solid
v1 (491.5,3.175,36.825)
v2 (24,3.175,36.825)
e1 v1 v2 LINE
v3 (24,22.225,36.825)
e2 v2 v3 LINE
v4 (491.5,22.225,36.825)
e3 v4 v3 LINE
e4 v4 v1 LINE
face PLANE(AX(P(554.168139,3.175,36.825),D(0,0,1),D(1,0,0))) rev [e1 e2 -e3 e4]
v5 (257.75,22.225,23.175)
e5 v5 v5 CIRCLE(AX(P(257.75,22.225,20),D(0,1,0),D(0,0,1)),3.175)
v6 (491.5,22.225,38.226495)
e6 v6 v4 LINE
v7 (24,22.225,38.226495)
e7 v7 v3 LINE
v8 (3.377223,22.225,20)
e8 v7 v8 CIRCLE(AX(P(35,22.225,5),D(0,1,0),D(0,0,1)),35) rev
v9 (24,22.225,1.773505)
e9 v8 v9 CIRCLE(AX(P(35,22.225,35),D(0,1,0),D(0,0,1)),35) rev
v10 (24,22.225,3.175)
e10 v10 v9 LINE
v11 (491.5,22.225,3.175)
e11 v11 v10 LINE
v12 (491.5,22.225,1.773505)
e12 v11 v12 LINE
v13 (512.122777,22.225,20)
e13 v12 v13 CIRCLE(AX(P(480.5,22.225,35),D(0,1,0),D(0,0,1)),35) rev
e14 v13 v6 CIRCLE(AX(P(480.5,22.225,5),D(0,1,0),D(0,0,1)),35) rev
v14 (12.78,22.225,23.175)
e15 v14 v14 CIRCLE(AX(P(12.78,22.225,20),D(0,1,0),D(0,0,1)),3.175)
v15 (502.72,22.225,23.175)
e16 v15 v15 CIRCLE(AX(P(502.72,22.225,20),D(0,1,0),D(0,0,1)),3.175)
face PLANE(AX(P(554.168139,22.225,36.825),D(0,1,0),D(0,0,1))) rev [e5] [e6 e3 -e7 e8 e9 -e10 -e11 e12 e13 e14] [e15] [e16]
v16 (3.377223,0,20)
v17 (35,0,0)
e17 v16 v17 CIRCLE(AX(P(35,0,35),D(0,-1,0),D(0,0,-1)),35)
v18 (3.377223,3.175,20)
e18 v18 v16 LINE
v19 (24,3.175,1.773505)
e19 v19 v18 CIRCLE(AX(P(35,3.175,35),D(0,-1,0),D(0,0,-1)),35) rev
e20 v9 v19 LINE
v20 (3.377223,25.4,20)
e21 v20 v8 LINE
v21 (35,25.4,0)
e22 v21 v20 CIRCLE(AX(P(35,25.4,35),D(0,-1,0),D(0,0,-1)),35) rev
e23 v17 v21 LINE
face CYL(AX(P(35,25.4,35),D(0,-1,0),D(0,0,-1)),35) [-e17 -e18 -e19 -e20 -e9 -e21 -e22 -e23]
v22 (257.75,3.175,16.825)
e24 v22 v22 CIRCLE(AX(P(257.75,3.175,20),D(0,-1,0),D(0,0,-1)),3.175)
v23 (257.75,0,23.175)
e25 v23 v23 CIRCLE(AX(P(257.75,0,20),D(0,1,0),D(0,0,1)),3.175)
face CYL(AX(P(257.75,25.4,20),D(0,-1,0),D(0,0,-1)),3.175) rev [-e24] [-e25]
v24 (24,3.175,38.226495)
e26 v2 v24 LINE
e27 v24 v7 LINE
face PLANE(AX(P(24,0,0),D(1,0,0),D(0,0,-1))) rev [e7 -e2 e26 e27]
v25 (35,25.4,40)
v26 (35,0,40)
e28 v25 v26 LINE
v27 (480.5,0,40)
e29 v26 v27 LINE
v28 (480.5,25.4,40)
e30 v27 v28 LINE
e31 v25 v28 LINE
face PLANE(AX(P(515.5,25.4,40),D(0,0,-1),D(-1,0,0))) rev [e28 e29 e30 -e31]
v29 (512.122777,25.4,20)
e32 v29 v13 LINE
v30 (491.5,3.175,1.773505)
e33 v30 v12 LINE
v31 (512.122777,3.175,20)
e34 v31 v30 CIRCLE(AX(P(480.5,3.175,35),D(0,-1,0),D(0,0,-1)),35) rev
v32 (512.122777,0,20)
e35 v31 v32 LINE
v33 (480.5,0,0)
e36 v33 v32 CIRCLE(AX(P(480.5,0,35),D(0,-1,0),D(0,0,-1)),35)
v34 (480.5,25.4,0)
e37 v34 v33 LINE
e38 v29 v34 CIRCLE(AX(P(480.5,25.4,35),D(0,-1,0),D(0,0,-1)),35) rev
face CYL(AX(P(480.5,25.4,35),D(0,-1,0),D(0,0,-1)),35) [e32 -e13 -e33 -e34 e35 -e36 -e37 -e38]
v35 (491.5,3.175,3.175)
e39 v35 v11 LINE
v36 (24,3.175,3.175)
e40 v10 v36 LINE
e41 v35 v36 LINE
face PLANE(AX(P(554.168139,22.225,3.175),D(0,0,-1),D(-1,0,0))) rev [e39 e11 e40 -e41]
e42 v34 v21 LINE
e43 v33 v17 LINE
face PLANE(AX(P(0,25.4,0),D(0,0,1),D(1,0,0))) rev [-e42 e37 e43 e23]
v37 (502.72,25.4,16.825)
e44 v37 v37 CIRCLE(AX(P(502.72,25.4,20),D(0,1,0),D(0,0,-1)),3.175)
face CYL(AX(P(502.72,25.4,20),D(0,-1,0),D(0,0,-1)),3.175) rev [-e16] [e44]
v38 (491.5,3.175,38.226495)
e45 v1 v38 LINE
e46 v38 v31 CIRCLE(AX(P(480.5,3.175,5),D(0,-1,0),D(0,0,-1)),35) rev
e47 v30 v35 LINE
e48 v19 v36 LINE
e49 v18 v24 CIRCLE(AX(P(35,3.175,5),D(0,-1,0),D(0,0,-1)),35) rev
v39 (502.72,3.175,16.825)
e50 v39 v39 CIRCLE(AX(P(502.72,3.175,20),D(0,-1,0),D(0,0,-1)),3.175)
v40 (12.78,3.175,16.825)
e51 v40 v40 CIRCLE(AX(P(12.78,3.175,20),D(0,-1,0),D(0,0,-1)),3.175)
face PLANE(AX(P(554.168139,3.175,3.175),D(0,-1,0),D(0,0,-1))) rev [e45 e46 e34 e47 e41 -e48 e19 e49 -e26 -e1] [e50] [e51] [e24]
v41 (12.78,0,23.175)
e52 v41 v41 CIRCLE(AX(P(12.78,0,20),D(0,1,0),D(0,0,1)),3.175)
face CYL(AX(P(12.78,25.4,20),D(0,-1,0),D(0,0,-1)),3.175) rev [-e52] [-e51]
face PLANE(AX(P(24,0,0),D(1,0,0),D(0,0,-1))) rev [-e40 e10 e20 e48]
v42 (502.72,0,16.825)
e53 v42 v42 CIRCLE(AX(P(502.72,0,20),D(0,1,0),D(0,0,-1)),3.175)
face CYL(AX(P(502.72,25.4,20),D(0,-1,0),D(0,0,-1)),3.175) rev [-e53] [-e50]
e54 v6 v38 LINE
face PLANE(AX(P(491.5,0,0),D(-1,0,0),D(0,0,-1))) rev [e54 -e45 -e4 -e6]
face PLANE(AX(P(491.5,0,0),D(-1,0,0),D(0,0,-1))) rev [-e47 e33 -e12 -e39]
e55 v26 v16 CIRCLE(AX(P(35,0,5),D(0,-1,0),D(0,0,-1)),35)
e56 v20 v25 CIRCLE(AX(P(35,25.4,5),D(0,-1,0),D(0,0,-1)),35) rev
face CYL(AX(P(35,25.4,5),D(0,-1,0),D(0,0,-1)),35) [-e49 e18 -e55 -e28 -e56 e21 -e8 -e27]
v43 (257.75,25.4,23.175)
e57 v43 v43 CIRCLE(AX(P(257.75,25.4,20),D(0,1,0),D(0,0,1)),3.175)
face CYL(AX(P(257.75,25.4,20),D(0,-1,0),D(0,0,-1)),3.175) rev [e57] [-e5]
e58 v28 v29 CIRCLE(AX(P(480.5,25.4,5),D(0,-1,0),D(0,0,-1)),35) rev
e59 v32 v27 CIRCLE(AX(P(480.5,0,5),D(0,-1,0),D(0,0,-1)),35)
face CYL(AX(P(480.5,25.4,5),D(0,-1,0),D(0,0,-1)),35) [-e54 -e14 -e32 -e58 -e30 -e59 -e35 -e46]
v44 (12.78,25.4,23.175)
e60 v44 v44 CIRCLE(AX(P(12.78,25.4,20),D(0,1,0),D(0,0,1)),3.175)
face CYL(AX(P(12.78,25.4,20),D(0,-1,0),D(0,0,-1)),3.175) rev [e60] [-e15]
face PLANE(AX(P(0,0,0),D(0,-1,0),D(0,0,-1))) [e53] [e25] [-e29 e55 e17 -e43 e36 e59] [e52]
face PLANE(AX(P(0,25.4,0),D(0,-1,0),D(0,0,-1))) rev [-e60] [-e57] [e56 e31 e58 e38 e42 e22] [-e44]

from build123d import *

# Parameters (mm, degrees)
SKETCH1_W           = 515.5
SKETCH1_H           = 40
SKETCH1_R           = 3.175
BOSS_EXTRUDE1_DEPTH = 25.4
CUT_EXTRUDE1_REACH  = 519.673
SKETCH2_W           = 33.65
SKETCH2_H           = 19.05
SKETCH4_W           = 40
SKETCH4_H           = 19.05
CUT_EXTRUDE2_DEPTH  = 24
FILLET1_R           = 35


with BuildPart() as part:
    # Sketch1 → Boss-Extrude1 (new body)
    with BuildSketch(Plane(origin=(0, 0, 0), x_dir=(1, 0, 0), z_dir=(0, 1, 0))):
        with Locations((257.75, -20)):
            Rectangle(SKETCH1_W, SKETCH1_H)
        with Locations(Location((257.75, -20, 0), (0, 0, 270))):
            Circle(SKETCH1_R, mode=Mode.SUBTRACT)
        with Locations(Location((12.78, -20, 0), (0, 0, 270))):
            Circle(SKETCH1_R, mode=Mode.SUBTRACT)
        with Locations(Location((502.72, -20, 0), (0, 0, 90))):
            Circle(SKETCH1_R, mode=Mode.SUBTRACT)
    extrude(amount=BOSS_EXTRUDE1_DEPTH)

    # Cut-Extrude1: up to this face of the body (flat: up to its plane)
    cut_extrude1_end = Plane(part.part.faces().sort_by_distance((515.5, 12.7, 20))[0])
    # Sketch2 → Cut-Extrude1 (cut, up to the picked face)
    with BuildSketch(Plane.ZY, mode=Mode.PRIVATE) as cut_extrude1_sk1:
        with Locations((20, 12.7)):
            Rectangle(SKETCH2_W, SKETCH2_H)
    cut_extrude1_tool1 = split(extrude(cut_extrude1_sk1.sketch, amount=-CUT_EXTRUDE1_REACH, mode=Mode.PRIVATE), bisect_by=cut_extrude1_end, keep=Keep.BOTH, mode=Mode.PRIVATE)
    add(cut_extrude1_tool1.solids().sort_by(Axis((0, 12.7, 20), (1, 0, 0)))[0], mode=Mode.SUBTRACT)

    # Sketch4 → Cut-Extrude2 (cut)
    with BuildSketch(Plane.ZY):
        with Locations((20, 12.7)):
            Rectangle(SKETCH4_W, SKETCH4_H)
    cut_extrude2 = extrude(amount=-CUT_EXTRUDE2_DEPTH, mode=Mode.SUBTRACT)

    # Mirror1: Cut-Extrude2 across plane
    add(cut_extrude2.mirror(Plane.ZY.offset(-257.75)), mode=Mode.SUBTRACT)

    # Fillet1
    # the kernel refuses this fillet: 35 mm, written as the material it takes off along each edge
    with BuildSketch(Plane(origin=(515.5, -65.275, 0), x_dir=(-1, 0, 0), z_dir=(0, 1, 0)), Plane(origin=(0, -65.275, 40), x_dir=(1, 0, 0), z_dir=(0, 1, 0))) as fillet1_piece_1:
        with BuildLine():
            CenterArc((FILLET1_R, FILLET1_R), FILLET1_R, 180, 90)
            Line((0, FILLET1_R), (0, 0))
            Line((0, 0), (FILLET1_R, 0))
        make_face()
    extrude(amount=178.175, mode=Mode.SUBTRACT)
    with BuildSketch(Plane(origin=(515.5, -65.275, 40), x_dir=(-1, 0, 0), z_dir=(0, 1, 0)), Plane(origin=(0, -65.275, 0), x_dir=(1, 0, 0), z_dir=(0, 1, 0))) as fillet1_piece_2:
        with BuildLine():
            CenterArc((FILLET1_R, -FILLET1_R), FILLET1_R, 90, 90)
            Line((0, -FILLET1_R), (0, 0))
            Line((0, 0), (FILLET1_R, 0))
        make_face()
    extrude(amount=178.175, mode=Mode.SUBTRACT)


solid = part.part
